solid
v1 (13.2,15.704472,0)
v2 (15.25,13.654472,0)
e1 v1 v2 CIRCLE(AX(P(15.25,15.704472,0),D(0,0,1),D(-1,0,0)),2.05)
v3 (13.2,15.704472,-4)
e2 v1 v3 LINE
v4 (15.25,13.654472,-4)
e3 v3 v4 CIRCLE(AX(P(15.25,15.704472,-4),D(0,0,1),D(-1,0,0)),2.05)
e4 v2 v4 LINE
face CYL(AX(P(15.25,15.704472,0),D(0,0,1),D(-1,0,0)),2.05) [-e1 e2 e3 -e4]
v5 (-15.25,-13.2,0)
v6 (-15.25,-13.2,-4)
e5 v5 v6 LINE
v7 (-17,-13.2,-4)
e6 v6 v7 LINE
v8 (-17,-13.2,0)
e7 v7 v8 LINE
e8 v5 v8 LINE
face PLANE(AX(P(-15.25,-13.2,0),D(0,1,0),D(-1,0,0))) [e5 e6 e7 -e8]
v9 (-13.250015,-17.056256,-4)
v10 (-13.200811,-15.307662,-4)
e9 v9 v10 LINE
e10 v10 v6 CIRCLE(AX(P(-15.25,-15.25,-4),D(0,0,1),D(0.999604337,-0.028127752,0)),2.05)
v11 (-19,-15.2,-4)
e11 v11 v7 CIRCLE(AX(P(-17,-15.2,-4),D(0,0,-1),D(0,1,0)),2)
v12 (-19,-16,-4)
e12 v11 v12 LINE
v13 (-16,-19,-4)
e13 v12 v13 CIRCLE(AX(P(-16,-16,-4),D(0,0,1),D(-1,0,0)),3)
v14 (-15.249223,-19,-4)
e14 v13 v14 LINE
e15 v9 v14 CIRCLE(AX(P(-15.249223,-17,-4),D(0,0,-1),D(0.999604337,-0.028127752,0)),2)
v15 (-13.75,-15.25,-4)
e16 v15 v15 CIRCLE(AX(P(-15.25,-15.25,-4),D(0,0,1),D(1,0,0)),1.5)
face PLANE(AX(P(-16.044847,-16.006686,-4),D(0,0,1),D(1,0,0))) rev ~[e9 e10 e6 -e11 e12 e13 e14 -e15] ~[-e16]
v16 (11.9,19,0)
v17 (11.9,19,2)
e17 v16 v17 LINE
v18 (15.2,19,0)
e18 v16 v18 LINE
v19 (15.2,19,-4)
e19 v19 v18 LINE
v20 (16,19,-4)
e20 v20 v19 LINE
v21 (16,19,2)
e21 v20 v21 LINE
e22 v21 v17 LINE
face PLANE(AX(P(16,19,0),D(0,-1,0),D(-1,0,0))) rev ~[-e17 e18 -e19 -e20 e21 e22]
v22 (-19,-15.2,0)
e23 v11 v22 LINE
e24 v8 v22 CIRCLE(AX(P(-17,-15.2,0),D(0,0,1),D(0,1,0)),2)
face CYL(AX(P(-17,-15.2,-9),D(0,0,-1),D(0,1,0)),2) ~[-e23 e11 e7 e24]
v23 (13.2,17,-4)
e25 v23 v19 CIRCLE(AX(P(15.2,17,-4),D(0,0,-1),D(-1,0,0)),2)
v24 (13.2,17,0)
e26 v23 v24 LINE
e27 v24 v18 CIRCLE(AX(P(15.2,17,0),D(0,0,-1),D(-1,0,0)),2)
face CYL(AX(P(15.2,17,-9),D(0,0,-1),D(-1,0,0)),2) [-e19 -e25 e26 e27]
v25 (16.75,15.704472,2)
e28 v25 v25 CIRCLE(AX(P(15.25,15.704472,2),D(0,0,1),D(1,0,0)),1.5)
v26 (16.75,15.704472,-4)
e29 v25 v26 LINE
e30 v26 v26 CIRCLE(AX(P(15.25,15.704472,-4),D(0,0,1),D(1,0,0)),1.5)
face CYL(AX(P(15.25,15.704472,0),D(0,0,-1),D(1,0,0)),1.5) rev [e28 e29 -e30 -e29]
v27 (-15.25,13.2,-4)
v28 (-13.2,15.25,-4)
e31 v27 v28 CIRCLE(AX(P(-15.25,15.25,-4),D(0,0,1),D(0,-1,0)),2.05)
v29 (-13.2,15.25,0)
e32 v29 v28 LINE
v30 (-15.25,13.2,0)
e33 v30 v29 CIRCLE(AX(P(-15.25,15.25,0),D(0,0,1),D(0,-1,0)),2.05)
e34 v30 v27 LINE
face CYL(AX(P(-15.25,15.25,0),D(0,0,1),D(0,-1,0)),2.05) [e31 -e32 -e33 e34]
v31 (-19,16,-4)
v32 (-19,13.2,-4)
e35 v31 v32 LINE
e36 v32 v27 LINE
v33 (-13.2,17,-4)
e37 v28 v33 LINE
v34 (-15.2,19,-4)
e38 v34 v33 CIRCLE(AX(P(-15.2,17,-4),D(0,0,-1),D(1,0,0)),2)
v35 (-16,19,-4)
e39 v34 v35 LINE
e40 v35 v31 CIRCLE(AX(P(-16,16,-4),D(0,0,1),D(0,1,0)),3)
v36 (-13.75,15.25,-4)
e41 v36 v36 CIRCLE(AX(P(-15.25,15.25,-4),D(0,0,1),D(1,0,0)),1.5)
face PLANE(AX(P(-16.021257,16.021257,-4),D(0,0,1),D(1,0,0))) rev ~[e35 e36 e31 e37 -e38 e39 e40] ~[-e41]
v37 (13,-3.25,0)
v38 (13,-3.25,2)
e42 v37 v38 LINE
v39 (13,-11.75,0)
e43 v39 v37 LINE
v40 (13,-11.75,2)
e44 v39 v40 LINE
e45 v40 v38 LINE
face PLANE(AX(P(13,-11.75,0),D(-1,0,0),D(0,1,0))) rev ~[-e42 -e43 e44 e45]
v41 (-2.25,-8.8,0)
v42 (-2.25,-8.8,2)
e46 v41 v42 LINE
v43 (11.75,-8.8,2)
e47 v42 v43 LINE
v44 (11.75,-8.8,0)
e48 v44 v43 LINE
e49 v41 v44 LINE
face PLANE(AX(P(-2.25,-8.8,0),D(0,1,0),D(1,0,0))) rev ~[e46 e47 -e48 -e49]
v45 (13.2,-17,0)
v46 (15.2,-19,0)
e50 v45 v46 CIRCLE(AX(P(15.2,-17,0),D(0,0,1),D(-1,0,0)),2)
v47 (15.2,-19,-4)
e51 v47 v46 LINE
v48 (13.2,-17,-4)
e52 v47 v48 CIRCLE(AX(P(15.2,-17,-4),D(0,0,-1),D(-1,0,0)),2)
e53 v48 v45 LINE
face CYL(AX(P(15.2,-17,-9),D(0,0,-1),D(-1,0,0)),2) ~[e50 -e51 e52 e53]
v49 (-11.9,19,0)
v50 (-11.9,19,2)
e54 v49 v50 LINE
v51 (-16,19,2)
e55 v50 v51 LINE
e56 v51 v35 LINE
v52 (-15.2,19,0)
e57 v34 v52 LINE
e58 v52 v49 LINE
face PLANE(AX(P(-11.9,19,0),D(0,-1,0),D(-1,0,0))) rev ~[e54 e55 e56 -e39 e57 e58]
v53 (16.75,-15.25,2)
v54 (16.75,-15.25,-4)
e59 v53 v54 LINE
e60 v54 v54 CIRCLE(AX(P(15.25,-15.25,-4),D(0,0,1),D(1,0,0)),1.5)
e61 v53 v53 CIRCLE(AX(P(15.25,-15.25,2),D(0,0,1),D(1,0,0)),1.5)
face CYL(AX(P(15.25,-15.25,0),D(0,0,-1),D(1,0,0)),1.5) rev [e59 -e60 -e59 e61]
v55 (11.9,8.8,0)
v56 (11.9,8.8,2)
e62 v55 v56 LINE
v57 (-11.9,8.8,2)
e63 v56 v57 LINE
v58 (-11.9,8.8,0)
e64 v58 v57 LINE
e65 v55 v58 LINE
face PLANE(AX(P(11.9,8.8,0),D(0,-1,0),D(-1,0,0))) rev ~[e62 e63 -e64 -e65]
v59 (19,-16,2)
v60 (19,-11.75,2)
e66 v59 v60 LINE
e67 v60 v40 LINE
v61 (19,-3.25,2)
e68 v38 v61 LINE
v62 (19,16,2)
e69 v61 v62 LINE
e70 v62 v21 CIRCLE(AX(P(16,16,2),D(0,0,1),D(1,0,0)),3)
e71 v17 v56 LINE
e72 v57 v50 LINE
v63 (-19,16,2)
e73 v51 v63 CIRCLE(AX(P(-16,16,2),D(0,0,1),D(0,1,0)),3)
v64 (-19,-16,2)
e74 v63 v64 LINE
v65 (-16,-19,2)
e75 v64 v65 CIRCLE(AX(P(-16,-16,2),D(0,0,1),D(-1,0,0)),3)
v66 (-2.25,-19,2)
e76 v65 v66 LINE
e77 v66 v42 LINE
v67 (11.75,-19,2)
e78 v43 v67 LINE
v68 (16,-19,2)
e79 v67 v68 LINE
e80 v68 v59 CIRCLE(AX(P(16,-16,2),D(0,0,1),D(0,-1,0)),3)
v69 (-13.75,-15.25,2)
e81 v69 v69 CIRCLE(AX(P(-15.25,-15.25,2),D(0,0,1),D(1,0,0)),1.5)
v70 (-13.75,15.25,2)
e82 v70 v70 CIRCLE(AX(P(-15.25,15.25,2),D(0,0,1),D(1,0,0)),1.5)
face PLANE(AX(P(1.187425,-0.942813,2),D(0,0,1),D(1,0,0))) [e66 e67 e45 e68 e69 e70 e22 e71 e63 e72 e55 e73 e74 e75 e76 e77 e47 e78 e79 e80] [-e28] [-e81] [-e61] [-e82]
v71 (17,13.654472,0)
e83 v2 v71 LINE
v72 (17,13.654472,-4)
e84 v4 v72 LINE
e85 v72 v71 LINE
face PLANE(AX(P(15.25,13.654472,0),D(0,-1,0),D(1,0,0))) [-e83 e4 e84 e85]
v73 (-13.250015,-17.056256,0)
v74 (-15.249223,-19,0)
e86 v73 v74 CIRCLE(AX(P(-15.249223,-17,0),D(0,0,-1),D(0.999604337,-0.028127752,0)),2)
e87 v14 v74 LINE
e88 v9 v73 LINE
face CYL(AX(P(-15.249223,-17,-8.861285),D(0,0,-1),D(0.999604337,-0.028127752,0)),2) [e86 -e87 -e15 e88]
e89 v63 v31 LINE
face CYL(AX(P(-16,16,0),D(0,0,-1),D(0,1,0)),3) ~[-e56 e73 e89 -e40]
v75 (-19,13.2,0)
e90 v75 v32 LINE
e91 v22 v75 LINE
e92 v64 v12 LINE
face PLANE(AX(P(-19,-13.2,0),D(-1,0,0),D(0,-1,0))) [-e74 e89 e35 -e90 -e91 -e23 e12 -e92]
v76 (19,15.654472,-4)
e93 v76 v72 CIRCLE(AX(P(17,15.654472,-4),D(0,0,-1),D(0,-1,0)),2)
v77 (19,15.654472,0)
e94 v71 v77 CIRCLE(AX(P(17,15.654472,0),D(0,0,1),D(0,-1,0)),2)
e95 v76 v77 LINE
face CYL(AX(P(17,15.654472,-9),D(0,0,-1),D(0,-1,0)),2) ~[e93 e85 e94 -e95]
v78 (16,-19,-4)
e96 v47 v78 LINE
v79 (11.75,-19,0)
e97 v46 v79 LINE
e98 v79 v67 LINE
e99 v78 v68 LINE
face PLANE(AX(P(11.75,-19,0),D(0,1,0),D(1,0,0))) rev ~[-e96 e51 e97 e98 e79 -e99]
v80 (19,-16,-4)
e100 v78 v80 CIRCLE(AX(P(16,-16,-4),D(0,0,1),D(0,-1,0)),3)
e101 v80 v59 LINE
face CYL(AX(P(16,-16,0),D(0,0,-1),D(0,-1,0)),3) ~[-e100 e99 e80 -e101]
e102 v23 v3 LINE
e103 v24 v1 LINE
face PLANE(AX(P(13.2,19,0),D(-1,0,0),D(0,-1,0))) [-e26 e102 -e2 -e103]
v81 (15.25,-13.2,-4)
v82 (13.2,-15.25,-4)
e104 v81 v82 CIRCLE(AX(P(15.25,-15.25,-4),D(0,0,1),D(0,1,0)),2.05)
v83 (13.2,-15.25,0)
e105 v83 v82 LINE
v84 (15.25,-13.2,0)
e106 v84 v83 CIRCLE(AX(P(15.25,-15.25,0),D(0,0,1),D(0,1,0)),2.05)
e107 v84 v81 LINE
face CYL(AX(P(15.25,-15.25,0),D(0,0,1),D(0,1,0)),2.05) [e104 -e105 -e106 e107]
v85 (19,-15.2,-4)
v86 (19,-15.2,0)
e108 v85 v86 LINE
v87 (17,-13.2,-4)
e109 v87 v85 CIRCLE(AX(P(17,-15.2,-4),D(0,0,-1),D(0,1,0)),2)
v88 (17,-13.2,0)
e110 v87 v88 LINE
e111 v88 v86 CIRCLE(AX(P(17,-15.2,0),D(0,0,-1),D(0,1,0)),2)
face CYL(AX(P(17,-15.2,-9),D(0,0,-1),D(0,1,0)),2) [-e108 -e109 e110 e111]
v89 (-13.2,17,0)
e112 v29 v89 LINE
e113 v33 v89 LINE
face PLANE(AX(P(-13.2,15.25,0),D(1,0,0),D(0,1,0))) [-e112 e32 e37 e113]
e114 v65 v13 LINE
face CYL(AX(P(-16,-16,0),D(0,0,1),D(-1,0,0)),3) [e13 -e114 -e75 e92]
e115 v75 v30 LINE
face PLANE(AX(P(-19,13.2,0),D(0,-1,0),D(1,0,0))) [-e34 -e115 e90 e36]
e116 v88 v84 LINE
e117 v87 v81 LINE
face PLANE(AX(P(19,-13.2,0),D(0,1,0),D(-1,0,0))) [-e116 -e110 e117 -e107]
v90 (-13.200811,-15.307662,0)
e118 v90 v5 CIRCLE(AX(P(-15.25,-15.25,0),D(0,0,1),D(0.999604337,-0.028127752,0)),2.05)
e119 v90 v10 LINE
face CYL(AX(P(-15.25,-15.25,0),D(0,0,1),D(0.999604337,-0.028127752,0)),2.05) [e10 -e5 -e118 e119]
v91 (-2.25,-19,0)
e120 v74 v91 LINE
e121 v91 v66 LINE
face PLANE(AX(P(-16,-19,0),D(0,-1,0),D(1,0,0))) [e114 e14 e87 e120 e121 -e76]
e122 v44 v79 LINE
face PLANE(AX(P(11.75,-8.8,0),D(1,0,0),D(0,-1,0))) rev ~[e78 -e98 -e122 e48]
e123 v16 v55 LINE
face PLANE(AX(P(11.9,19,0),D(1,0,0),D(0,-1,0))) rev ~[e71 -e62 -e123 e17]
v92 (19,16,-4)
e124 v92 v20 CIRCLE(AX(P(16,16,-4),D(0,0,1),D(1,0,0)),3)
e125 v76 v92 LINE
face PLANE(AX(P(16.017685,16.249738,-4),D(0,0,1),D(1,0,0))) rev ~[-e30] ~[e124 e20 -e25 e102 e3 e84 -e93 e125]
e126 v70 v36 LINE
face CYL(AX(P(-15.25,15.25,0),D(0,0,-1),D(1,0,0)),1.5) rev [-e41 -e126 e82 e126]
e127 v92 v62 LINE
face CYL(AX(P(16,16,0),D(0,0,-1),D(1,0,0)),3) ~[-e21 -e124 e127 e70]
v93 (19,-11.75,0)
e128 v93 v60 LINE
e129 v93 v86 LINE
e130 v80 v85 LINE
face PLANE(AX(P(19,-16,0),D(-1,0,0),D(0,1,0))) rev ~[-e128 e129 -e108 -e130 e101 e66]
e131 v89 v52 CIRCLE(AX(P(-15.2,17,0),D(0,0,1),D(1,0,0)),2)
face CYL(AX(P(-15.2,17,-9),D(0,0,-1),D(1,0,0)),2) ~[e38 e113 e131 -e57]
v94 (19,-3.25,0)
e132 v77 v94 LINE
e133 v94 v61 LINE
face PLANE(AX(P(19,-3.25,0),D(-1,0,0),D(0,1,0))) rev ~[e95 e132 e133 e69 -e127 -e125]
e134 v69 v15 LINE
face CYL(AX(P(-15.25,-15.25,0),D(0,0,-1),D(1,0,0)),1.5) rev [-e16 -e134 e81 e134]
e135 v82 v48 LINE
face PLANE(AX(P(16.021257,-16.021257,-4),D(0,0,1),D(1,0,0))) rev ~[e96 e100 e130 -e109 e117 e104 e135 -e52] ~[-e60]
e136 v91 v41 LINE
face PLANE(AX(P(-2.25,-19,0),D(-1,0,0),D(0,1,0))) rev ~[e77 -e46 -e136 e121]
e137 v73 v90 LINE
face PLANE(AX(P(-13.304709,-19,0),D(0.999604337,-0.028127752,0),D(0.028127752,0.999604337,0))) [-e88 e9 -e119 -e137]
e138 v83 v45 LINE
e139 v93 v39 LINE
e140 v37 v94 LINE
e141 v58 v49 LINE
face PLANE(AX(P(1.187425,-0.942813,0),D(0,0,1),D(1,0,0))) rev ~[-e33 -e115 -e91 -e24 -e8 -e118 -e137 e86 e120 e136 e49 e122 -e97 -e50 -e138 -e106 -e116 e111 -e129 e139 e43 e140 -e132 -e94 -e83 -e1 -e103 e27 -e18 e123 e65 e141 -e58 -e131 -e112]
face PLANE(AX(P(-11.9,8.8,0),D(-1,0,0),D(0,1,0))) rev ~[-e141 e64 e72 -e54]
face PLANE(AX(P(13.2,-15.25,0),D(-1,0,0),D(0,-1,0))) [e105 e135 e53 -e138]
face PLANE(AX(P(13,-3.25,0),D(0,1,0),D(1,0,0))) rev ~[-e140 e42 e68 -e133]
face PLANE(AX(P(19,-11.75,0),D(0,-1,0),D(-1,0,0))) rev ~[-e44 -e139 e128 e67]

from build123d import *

# Parameters (mm, degrees)
F0_R        = 1.5
F1_DEPTH    = 2
F2_DEPTH    = 4
F3_T1_DEPTH = 9
F4_T1_DEPTH = 9
F4_T3_DEPTH = 8.8612846748


# Not quite as in the source:
# - a fillet or chamfer that OpenCascade refuses, or shapes differently, is made with other operations: its cross-section is extruded or revolved along the edge and cut away or added


with BuildPart() as f1:
    # F0 (on Top) → F1 (new body)
    with BuildSketch(Plane.XY):
        with BuildLine():
            Line((11.75, -19), (13.2, -19))
            Line((13.2, -19), (13.2, -15.25))
            ThreePointArc((13.2, -15.25), (13.8004310986, -13.8004310986), (15.25, -13.2))
            Line((15.25, -13.2), (19, -13.2))
            Line((19, -13.2), (19, -11.75))
            Line((19, -11.75), (13, -11.75))
            Line((13, -11.75), (13, -3.25))
            Line((13, -3.25), (19, -3.25))
            Line((19, -3.25), (19, 13.6544716179))
            Line((19, 13.6544716179), (15.25, 13.6544716179))
            ThreePointArc((15.25, 13.6544716179), (13.8004310986, 14.2549027165), (13.2, 15.7044716179))
            Line((13.2, 15.7044716179), (13.2, 19))
            Line((13.2, 19), (11.9, 19))
            Line((11.9, 19), (11.9, 8.8))
            Line((11.9, 8.8), (0, 8.8))
            Line((0, 8.8), (-11.9, 8.8))
            Line((-11.9, 8.8), (-11.9, 19))
            Line((-11.9, 19), (-13.2, 19))
            Line((-13.2, 19), (-13.2, 15.25))
            ThreePointArc((-13.2, 15.25), (-13.8004310986, 13.8004310986), (-15.25, 13.2))
            Line((-15.25, 13.2), (-19, 13.2))
            Line((-19, 13.2), (-19, -13.2))
            Line((-19, -13.2), (-15.25, -13.2))
            ThreePointArc((-15.25, -13.2), (-13.7801859172, -13.8209630649), (-13.2008111101, -15.3076618908))
            Line((-13.2008111101, -15.3076618908), (-13.304709388, -19))
            Line((-13.304709388, -19), (-2.25, -19))
            Line((-2.25, -19), (-2.25, -8.8))
            Line((-2.25, -8.8), (11.75, -8.8))
            Line((11.75, -8.8), (11.75, -19))
        make_face()
        with BuildLine():
            Line((-19, 16), (-19, 13.2))
            Line((-19, 13.2), (-15.25, 13.2))
            ThreePointArc((-15.25, 13.2), (-13.8004310986, 13.8004310986), (-13.2, 15.25))
            Line((-13.2, 15.25), (-13.2, 19))
            Line((-13.2, 19), (-16, 19))
            ThreePointArc((-16, 19), (-18.1213203436, 18.1213203436), (-19, 16))
        make_face()
        with Locations((-15.25, 15.25)):
            Circle(F0_R, mode=Mode.SUBTRACT)
        with BuildLine():
            Line((15.25, 13.6544716179), (19, 13.6544716179))
            Line((19, 13.6544716179), (19, 16))
            ThreePointArc((19, 16), (18.1213203436, 18.1213203436), (16, 19))
            Line((16, 19), (13.2, 19))
            Line((13.2, 19), (13.2, 15.7044716179))
            ThreePointArc((13.2, 15.7044716179), (13.8004310986, 14.2549027165), (15.25, 13.6544716179))
        make_face()
        with Locations((15.25, 15.7044716179)):
            Circle(F0_R, mode=Mode.SUBTRACT)
        with BuildLine():
            Line((13.2, -19), (16, -19))
            ThreePointArc((16, -19), (18.1213203436, -18.1213203436), (19, -16))
            Line((19, -16), (19, -13.2))
            Line((19, -13.2), (15.25, -13.2))
            ThreePointArc((15.25, -13.2), (13.8004310986, -13.8004310986), (13.2, -15.25))
            Line((13.2, -15.25), (13.2, -19))
        make_face()
        with Locations((15.25, -15.25)):
            Circle(F0_R, mode=Mode.SUBTRACT)
        with BuildLine():
            Line((-16, -19), (-13.304709388, -19))
            Line((-13.304709388, -19), (-13.2008111101, -15.3076618908))
            ThreePointArc((-13.2008111101, -15.3076618908), (-13.7801859172, -13.8209630649), (-15.25, -13.2))
            Line((-15.25, -13.2), (-19, -13.2))
            Line((-19, -13.2), (-19, -16))
            ThreePointArc((-19, -16), (-18.1213203436, -18.1213203436), (-16, -19))
        make_face()
        with Locations((-15.25, -15.25)):
            Circle(F0_R, mode=Mode.SUBTRACT)
    extrude(amount=F1_DEPTH)

    # F0 (on Top) → F2 (join)
    with BuildSketch(Plane.XY):
        with BuildLine():
            Line((-16, -19), (-13.304709388, -19))
            Line((-13.304709388, -19), (-13.2008111101, -15.3076618908))
            ThreePointArc((-13.2008111101, -15.3076618908), (-13.7801859172, -13.8209630649), (-15.25, -13.2))
            Line((-15.25, -13.2), (-19, -13.2))
            Line((-19, -13.2), (-19, -16))
            ThreePointArc((-19, -16), (-18.1213203436, -18.1213203436), (-16, -19))
        make_face()
        with Locations((-15.25, -15.25)):
            Circle(F0_R, mode=Mode.SUBTRACT)
        with BuildLine():
            Line((13.2, -19), (16, -19))
            ThreePointArc((16, -19), (18.1213203436, -18.1213203436), (19, -16))
            Line((19, -16), (19, -13.2))
            Line((19, -13.2), (15.25, -13.2))
            ThreePointArc((15.25, -13.2), (13.8004310986, -13.8004310986), (13.2, -15.25))
            Line((13.2, -15.25), (13.2, -19))
        make_face()
        with Locations((15.25, -15.25)):
            Circle(F0_R, mode=Mode.SUBTRACT)
        with BuildLine():
            Line((15.25, 13.6544716179), (19, 13.6544716179))
            Line((19, 13.6544716179), (19, 16))
            ThreePointArc((19, 16), (18.1213203436, 18.1213203436), (16, 19))
            Line((16, 19), (13.2, 19))
            Line((13.2, 19), (13.2, 15.7044716179))
            ThreePointArc((13.2, 15.7044716179), (13.8004310986, 14.2549027165), (15.25, 13.6544716179))
        make_face()
        with Locations((15.25, 15.7044716179)):
            Circle(F0_R, mode=Mode.SUBTRACT)
        with BuildLine():
            Line((-19, 16), (-19, 13.2))
            Line((-19, 13.2), (-15.25, 13.2))
            ThreePointArc((-15.25, 13.2), (-13.8004310986, 13.8004310986), (-13.2, 15.25))
            Line((-13.2, 15.25), (-13.2, 19))
            Line((-13.2, 19), (-16, 19))
            ThreePointArc((-16, 19), (-18.1213203436, 18.1213203436), (-19, 16))
        make_face()
        with Locations((-15.25, 15.25)):
            Circle(F0_R, mode=Mode.SUBTRACT)
    extrude(amount=-F2_DEPTH)

    # F3: fillet of radius 2 on 1 edges, made by hand

    # F3_s2 → F3_t1 (cut)
    with BuildSketch(Plane.XY.offset(-9)):
        with BuildLine():
            ThreePointArc((-13.2, 17), (-13.7857864376, 18.4142135624), (-15.2, 19))
            Line((-15.2, 19), (-13.2, 19))
            Line((-13.2, 19), (-13.2, 17))
        make_face()
    extrude(amount=F3_T1_DEPTH, mode=Mode.SUBTRACT)

    # F4: fillet of radius 2 on 6 edges, made by hand

    # F4_s2 → F4_t1 (cut)
    with BuildSketch(Plane.XY.offset(-9)):
        with BuildLine():
            ThreePointArc((13.2, 17), (13.7857864376, 18.4142135624), (15.2, 19))
            Line((15.2, 19), (13.2, 19))
            Line((13.2, 19), (13.2, 17))
        make_face()
        with BuildLine():
            ThreePointArc((17, 13.6544716179), (18.4142135624, 14.2402580556), (19, 15.6544716179))
            Line((19, 15.6544716179), (19, 13.6544716179))
            Line((19, 13.6544716179), (17, 13.6544716179))
        make_face()
        with BuildLine():
            ThreePointArc((17, -13.2), (18.4142135624, -13.7857864376), (19, -15.2))
            Line((19, -15.2), (19, -13.2))
            Line((19, -13.2), (17, -13.2))
        make_face()
        with BuildLine():
            ThreePointArc((13.2, -17), (13.7857864376, -18.4142135624), (15.2, -19))
            Line((15.2, -19), (13.2, -19))
            Line((13.2, -19), (13.2, -17))
        make_face()
        with BuildLine():
            ThreePointArc((-17, -13.2), (-18.4142135624, -13.7857864376), (-19, -15.2))
            Line((-19, -15.2), (-19, -13.2))
            Line((-19, -13.2), (-17, -13.2))
        make_face()
    extrude(amount=F4_T1_DEPTH, mode=Mode.SUBTRACT)

    # F4_s4 → F4_t3 (cut)
    with BuildSketch(Plane.XY.offset(-8.8612846748)):
        with BuildLine():
            ThreePointArc((-13.2500145849, -17.0562555032), (-13.8550408822, -18.4339649588), (-15.249223258, -19))
            Line((-15.249223258, -19), (-13.304709388, -19))
            Line((-13.304709388, -19), (-13.2500145849, -17.0562555032))
        make_face()
    extrude(amount=F4_T3_DEPTH, mode=Mode.SUBTRACT)


solid = f1.part
